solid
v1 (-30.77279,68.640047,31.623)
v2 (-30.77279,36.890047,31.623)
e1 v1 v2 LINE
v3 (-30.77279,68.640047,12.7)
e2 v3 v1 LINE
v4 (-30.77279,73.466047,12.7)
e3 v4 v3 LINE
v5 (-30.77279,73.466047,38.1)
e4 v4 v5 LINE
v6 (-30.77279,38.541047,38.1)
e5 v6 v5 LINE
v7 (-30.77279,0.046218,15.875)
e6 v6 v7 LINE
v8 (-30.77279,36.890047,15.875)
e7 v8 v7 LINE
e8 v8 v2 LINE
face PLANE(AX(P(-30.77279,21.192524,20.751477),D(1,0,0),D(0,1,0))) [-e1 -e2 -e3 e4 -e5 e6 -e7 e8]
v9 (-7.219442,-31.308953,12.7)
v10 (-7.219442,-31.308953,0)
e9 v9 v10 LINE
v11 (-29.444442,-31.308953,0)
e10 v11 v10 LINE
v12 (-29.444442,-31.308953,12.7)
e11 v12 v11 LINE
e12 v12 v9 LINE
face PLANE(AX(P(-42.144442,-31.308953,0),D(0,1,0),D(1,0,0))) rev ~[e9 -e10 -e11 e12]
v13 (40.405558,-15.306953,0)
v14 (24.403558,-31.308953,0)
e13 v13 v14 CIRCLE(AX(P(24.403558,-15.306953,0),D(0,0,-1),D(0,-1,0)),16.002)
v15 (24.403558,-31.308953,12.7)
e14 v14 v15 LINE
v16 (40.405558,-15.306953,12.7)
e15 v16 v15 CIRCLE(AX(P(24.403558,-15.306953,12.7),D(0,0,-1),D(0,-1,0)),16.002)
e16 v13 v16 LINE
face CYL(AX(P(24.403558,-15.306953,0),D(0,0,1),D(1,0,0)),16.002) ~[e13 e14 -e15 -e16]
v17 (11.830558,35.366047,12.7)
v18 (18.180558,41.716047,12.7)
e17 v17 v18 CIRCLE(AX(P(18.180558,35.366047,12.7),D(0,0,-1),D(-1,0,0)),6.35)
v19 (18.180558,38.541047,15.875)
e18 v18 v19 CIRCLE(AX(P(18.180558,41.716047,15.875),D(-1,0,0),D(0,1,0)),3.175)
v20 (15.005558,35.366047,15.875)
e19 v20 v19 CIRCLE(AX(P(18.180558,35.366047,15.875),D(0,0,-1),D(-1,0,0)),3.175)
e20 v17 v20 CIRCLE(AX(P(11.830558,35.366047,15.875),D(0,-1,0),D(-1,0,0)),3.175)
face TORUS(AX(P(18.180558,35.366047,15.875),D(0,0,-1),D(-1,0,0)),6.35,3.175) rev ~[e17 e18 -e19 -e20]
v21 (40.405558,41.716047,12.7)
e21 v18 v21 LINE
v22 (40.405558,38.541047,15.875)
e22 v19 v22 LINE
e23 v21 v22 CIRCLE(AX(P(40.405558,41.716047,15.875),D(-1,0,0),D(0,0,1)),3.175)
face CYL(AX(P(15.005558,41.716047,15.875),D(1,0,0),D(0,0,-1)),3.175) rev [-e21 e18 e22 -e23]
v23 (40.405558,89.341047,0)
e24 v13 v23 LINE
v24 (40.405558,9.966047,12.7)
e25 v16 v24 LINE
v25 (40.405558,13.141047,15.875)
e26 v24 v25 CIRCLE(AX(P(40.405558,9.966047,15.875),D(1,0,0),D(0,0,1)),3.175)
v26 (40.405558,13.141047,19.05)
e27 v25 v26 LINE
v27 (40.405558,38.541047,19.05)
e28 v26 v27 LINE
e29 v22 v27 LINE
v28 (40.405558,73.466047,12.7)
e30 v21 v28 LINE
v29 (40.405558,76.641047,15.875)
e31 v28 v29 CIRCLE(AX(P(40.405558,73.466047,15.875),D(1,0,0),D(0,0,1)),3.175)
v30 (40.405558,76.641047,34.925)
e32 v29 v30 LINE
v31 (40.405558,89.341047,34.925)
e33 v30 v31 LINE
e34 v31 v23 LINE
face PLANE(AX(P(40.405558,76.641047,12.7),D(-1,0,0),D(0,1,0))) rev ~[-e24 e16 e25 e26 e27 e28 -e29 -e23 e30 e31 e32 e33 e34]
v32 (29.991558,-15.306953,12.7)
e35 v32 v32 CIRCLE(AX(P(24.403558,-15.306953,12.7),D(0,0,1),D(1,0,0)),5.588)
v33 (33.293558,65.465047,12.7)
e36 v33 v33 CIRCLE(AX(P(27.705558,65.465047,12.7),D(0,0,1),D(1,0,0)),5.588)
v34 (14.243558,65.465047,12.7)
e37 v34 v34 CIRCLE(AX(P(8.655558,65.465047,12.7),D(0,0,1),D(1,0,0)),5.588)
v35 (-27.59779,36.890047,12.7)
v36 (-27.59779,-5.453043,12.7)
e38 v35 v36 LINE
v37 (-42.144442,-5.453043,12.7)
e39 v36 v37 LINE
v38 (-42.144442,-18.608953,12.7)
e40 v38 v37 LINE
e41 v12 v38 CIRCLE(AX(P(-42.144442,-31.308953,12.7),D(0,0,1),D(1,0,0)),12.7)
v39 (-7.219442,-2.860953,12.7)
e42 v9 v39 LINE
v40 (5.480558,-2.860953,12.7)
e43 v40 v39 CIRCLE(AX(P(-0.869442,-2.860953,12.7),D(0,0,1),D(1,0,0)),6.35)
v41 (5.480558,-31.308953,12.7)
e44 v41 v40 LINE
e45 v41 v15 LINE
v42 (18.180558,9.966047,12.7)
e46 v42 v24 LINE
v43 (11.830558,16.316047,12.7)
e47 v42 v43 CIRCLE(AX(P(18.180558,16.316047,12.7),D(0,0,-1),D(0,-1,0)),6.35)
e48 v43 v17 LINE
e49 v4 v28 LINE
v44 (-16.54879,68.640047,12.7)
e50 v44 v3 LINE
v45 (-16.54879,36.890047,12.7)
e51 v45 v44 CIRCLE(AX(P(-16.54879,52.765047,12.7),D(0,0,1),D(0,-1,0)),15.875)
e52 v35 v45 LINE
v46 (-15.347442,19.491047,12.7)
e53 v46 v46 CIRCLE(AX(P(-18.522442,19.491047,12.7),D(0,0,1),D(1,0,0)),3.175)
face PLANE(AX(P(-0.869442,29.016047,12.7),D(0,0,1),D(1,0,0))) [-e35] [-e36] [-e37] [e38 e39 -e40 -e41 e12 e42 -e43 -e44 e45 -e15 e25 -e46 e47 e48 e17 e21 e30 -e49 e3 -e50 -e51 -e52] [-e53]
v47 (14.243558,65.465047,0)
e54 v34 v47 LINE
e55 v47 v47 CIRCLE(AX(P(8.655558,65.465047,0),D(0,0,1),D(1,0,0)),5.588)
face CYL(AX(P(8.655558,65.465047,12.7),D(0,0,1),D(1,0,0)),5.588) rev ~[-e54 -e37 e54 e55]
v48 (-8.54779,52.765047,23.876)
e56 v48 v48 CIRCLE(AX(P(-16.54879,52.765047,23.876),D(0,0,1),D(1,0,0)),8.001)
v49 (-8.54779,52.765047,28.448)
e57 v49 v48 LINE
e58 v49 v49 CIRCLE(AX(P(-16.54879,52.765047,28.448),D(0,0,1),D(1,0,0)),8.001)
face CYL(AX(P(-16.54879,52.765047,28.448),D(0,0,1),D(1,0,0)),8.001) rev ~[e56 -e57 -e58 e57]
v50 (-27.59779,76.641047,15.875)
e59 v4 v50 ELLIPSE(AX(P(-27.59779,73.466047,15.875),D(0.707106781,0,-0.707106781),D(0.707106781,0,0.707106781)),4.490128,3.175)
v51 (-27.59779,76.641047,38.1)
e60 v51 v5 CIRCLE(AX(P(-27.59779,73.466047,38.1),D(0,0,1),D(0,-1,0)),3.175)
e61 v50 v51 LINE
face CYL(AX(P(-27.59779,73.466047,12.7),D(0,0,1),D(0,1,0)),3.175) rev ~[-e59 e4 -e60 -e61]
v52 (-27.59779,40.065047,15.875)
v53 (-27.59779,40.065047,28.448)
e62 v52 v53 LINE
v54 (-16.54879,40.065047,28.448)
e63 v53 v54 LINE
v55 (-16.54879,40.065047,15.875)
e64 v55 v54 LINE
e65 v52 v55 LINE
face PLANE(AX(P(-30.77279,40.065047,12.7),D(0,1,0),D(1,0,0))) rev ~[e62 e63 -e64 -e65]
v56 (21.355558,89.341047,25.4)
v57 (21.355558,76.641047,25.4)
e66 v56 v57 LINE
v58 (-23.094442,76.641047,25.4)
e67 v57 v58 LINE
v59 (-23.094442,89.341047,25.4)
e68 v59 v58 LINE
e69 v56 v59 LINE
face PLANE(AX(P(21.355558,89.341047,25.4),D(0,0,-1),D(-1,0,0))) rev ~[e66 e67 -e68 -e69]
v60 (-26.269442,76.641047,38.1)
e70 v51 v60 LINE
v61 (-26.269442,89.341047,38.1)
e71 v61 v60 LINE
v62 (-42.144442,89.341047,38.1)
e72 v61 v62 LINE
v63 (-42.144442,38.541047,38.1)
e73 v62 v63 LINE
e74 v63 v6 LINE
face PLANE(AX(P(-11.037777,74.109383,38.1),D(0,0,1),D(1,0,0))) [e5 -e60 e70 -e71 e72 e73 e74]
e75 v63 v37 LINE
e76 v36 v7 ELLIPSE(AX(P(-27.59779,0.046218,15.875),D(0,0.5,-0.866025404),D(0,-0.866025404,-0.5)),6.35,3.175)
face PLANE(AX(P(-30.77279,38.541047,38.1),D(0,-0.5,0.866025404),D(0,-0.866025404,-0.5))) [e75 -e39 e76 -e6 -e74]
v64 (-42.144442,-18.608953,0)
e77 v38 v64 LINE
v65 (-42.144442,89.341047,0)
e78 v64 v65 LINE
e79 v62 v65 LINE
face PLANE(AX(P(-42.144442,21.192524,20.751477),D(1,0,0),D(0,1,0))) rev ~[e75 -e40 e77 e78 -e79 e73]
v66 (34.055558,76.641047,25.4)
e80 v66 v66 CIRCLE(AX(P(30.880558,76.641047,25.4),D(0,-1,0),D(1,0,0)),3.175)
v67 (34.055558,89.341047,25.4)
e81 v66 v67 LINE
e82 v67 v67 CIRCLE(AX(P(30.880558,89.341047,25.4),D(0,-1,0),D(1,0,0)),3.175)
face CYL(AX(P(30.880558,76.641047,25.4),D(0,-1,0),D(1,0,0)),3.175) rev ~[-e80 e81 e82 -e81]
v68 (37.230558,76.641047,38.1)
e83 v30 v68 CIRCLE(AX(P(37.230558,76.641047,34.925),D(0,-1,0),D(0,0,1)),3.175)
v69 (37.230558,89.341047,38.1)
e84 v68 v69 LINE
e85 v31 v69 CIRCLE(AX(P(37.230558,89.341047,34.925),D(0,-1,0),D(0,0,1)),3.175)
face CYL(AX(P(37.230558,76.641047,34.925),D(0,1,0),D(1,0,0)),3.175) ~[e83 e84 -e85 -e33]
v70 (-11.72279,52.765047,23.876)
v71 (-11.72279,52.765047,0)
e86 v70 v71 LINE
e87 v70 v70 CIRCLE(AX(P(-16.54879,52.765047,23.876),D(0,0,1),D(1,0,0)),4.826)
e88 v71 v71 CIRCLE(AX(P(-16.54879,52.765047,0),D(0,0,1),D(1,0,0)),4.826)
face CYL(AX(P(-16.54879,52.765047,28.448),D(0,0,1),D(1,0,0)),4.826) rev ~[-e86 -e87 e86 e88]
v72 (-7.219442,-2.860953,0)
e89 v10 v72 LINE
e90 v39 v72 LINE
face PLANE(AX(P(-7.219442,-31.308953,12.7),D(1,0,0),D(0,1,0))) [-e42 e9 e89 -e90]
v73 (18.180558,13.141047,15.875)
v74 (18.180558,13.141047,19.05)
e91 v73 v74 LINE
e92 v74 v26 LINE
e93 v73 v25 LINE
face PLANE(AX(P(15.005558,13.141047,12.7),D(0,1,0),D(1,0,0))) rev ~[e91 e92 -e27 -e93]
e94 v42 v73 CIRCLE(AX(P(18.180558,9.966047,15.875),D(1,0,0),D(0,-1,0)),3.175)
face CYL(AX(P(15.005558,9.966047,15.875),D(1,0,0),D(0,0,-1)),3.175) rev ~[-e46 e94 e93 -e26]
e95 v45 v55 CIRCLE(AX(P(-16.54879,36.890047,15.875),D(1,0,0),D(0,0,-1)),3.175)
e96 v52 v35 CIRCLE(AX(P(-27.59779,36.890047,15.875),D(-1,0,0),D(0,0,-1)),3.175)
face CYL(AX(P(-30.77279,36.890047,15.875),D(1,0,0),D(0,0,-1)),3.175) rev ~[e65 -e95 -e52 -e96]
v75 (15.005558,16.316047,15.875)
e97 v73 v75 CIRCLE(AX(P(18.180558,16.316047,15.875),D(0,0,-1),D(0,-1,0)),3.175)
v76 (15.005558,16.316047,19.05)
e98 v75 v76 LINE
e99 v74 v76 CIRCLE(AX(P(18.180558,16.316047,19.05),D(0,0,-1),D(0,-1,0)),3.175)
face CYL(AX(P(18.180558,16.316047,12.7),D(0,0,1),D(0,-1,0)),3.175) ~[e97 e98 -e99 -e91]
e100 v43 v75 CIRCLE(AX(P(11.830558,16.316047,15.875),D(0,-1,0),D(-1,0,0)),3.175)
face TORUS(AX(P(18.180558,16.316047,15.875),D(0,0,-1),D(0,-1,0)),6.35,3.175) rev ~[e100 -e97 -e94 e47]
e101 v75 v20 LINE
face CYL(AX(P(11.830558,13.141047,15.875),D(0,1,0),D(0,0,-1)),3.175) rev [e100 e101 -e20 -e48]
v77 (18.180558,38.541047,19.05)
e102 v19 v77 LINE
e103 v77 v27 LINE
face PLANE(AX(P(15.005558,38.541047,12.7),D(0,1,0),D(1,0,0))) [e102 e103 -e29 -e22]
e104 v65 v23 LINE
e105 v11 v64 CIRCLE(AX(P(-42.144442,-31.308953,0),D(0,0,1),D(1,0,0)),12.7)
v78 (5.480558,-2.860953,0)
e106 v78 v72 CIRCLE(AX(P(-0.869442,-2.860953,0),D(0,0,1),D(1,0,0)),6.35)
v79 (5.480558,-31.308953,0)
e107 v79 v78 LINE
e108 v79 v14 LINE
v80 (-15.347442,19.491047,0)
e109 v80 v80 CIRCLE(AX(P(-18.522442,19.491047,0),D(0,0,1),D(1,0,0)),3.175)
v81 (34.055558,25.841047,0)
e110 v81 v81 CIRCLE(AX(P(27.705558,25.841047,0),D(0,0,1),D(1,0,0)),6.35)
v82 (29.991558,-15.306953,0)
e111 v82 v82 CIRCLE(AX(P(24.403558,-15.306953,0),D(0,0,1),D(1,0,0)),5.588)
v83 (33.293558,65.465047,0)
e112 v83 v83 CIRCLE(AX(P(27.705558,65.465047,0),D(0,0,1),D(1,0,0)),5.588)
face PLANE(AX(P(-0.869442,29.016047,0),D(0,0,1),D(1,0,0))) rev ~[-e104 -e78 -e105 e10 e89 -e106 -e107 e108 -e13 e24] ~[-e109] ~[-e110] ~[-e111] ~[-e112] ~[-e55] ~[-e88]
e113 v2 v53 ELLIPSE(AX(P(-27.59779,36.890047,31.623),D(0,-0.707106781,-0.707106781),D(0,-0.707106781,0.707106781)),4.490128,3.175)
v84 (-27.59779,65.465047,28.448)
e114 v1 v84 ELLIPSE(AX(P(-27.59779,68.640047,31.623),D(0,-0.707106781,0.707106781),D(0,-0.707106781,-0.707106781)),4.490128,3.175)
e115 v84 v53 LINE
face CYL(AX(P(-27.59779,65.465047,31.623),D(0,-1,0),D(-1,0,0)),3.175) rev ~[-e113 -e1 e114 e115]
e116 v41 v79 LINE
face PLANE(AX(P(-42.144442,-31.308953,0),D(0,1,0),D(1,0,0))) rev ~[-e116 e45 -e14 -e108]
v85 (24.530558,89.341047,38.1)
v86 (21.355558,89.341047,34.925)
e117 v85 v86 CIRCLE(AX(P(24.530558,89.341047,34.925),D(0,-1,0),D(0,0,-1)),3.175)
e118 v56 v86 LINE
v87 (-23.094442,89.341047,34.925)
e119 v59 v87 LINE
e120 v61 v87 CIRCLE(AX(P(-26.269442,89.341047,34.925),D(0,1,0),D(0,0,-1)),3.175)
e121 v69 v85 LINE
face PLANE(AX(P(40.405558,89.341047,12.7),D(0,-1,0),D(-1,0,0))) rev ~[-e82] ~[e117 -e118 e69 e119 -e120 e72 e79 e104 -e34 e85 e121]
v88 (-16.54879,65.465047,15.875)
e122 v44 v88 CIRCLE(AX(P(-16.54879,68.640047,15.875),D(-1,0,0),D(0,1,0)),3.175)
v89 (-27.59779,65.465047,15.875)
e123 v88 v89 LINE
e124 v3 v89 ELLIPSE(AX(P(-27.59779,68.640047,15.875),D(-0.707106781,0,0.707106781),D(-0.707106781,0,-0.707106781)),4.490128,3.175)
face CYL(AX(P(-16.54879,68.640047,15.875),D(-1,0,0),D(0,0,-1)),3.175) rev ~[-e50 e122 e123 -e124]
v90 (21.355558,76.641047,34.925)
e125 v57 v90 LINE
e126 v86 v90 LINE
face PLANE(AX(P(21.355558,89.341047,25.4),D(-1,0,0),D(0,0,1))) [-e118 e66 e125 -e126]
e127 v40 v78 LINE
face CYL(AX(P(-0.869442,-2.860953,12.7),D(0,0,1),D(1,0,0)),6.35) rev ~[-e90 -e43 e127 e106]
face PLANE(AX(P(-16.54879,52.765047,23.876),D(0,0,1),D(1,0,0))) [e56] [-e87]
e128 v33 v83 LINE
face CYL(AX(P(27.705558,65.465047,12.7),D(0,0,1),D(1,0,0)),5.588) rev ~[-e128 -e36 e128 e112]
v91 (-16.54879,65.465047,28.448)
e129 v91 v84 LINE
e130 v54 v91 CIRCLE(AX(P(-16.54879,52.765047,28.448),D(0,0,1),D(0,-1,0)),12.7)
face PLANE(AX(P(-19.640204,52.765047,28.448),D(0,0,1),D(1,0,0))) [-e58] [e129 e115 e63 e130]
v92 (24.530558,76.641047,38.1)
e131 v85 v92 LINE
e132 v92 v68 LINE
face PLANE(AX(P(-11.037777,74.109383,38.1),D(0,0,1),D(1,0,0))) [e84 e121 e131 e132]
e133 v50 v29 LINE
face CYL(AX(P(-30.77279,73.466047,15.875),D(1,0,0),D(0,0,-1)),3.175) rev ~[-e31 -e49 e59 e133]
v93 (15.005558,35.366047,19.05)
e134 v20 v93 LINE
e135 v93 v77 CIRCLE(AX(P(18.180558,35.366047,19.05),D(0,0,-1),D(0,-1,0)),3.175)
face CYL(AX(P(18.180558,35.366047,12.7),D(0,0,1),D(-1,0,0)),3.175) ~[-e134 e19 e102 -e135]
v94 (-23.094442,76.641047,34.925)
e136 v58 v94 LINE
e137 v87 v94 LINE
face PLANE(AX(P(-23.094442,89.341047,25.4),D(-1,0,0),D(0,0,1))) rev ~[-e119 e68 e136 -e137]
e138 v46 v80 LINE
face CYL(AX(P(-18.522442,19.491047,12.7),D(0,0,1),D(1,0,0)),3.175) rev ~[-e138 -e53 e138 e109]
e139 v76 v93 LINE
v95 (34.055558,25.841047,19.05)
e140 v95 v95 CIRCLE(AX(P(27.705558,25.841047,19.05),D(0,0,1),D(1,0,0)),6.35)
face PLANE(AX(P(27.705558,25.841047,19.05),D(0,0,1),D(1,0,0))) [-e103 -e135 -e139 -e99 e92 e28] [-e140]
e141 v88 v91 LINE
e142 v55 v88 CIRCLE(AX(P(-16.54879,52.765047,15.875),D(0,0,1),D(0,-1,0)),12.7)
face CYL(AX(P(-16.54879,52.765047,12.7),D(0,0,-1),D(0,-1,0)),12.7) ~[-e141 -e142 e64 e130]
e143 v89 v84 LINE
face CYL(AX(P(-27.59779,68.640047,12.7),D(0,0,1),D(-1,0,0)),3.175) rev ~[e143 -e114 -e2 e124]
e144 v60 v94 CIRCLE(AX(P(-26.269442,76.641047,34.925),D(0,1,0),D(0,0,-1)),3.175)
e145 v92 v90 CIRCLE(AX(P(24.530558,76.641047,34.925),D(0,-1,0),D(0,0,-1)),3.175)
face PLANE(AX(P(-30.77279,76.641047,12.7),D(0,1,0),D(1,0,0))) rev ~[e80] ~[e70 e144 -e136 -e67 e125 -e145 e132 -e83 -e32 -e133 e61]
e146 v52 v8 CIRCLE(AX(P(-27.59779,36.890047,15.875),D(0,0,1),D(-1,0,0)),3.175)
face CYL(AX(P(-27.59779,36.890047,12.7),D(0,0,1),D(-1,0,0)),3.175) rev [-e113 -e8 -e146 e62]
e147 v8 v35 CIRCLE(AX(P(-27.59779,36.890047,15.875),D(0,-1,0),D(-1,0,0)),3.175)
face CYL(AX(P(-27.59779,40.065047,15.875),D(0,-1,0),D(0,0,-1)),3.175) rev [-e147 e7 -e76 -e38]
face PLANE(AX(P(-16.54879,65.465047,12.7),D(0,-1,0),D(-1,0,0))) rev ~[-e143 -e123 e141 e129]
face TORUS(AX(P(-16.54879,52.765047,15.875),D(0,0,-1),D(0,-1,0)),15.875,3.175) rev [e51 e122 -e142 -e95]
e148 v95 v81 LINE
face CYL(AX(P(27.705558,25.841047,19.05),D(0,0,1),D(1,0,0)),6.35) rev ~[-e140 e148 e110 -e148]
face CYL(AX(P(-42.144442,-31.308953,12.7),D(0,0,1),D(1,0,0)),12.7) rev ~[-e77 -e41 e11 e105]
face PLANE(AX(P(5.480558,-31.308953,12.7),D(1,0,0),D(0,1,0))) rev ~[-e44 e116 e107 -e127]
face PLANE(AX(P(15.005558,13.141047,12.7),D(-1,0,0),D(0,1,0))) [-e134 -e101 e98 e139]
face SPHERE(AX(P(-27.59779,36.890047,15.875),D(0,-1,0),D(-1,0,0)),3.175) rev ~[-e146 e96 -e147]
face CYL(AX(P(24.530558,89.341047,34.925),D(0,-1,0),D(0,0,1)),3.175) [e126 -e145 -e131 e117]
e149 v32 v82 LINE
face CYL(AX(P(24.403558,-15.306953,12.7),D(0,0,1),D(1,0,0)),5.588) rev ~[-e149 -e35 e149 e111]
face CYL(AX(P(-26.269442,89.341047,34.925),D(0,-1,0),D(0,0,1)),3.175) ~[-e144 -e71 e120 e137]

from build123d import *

# Parameters (mm, degrees)
F0_W      = 82.55
F0_H      = 120.65
F1_DEPTH  = 12.7
F3_DEPTH  = 25.4
F5_DEPTH  = 11.3716514647
F6_W      = 44.45
F6_H      = 12.7
F7_DEPTH  = 25.4
F8_W      = 25.4
F8_H      = 25.4
F9_DEPTH  = 6.35
F10_R     = 6.35
F11_DEPTH = 19.051
F13_DEPTH = 15.748
F14_R     = 4.826
F15_DEPTH = 28.449
F16_R     = 8.001
F16_R_2   = 4.826
F17_DEPTH = 4.572
F18_W     = 12.7
F18_H     = 28.448
F19_DEPTH = 25.4
F20_R     = 3.175
F20_R_2   = 5.588
F21_DEPTH = 12.701
F22_R     = 3.175
F23_DEPTH = 25.4
F25_DEPTH = 25.4
F26_R     = 16.002
F27_R     = 3.175


with BuildPart() as f1:
    # F0 (on Top) → F1 (new body)
    with BuildSketch(Plane.XY):
        with Locations((-0.8694417775, 29.0160470424)):
            Rectangle(F0_W, F0_H)
    extrude(amount=F1_DEPTH)

    # F2 (on face) → F3 (join)
    with BuildSketch(Plane.XY.offset(12.7)):
        Polygon((-30.7727903128, 89.3410470424), (-42.1444417775, 89.3410470424), (-42.1444417775, 76.6410470424), (-42.1444417775, 38.5410470424), (-30.7727903128, 38.5410470424), (-30.7727903128, 76.6410470424), (40.4055582225, 76.6410470424), (40.4055582225, 89.3410470424), align=None)
    extrude(amount=F3_DEPTH)

    # F4 (on face) → F5 (join, through all)
    with BuildSketch(Plane.YZ.offset(-30.7727903128)):
        Polygon((38.5410470424, 12.7), (38.5410470424, 38.1), (-5.4530434699, 12.7), align=None)
    extrude(amount=-F5_DEPTH)

    # F6 (on face) → F7 (cut)
    with BuildSketch(Plane(origin=(0, 89.3410470424, 0), x_dir=(-1, 0, 0), z_dir=(0, 1, 0))):
        with Locations((0.8694417775, 31.75)):
            Rectangle(F6_W, F6_H)
    extrude(amount=-F7_DEPTH, mode=Mode.SUBTRACT)

    # F8 (on face) → F9 (join)
    with BuildSketch(Plane.XY.offset(12.7)):
        with Locations((27.7055582225, 25.8410470424)):
            Rectangle(F8_W, F8_H)
    extrude(amount=F9_DEPTH)

    # F10 (on face) → F11 (cut, through all)
    with BuildSketch(Plane.XY.offset(19.05)):
        with Locations((27.7055582225, 25.8410470424)):
            Circle(F10_R)
    extrude(amount=-F11_DEPTH, mode=Mode.SUBTRACT)

    # F12 (on face) → F13 (join)
    with BuildSketch(Plane.XY.offset(12.7)):
        with BuildLine():
            Line((-30.7727903128, 65.4650470424), (-30.7727903128, 40.0650470424))
            Line((-30.7727903128, 40.0650470424), (-16.5487903128, 40.0650470424))
            ThreePointArc((-16.5487903128, 40.0650470424), (-3.8487903128, 52.7650470424), (-16.5487903128, 65.4650470424))
            Line((-16.5487903128, 65.4650470424), (-30.7727903128, 65.4650470424))
        make_face()
    extrude(amount=F13_DEPTH)

    # F14 (on face) → F15 (cut, through all)
    with BuildSketch(Plane.XY.offset(28.448)):
        with Locations((-16.5487903128, 52.7650470424)):
            Circle(F14_R)
    extrude(amount=-F15_DEPTH, mode=Mode.SUBTRACT)

    # F16 (on face) → F17 (cut)
    with BuildSketch(Plane.XY.offset(28.448)):
        with Locations((-16.5487903128, 52.7650470424)):
            Circle(F16_R)
        with Locations((-16.5487903128, 52.7650470424)):
            Circle(F16_R_2, mode=Mode.SUBTRACT)
    extrude(amount=-F17_DEPTH, mode=Mode.SUBTRACT)

    # F18 (on face) → F19 (cut)
    with BuildSketch(Plane.XY.offset(12.7)):
        with Locations((-0.8694417775, -17.0849529576)):
            Rectangle(F18_W, F18_H)
        with BuildLine():
            ThreePointArc((5.4805582225, -2.8609529576), (-0.8694417775, 3.4890470424), (-7.2194417775, -2.8609529576))
            Line((-7.2194417775, -2.8609529576), (5.4805582225, -2.8609529576))
        make_face()
    extrude(amount=-F19_DEPTH, mode=Mode.SUBTRACT)

    # F20 (on face) → F21 (cut, through all)
    with BuildSketch(Plane.XY.offset(12.7)):
        with Locations((-18.5224417775, 19.4910470424)):
            Circle(F20_R)
        with Locations((24.4035582225, -15.3069529576)):
            Circle(F20_R_2)
        with Locations((27.7055582225, 65.4650470424)):
            Circle(F20_R_2)
        with Locations((8.6555582225, 65.4650470424)):
            Circle(F20_R_2)
    extrude(amount=-F21_DEPTH, mode=Mode.SUBTRACT)

    # F22 (on face) → F23 (cut)
    with BuildSketch(Plane.XZ.offset(-76.6410470424)):
        with Locations((30.8805582225, 25.4)):
            Circle(F22_R)
    extrude(amount=-F23_DEPTH, mode=Mode.SUBTRACT)

    # F24 (on face) → F25 (cut)
    with BuildSketch(Plane.XY.offset(12.7)):
        with BuildLine():
            Line((-42.1444417775, -31.3089529576), (-29.4444417775, -31.3089529576))
            ThreePointArc((-29.4444417775, -31.3089529576), (-33.1641856564, -22.3286968366), (-42.1444417775, -18.6089529576))
            Line((-42.1444417775, -18.6089529576), (-42.1444417775, -31.3089529576))
        make_face()
    extrude(amount=-F25_DEPTH, mode=Mode.SUBTRACT)

    # F26
    f26_edges = [f1.edges().sort_by_distance(p)[0] for p in [
        (40.405558, -31.308953, 6.35),
    ]]
    fillet(f26_edges, radius=F26_R)

    # F27
    f27_edges = [f1.edges().sort_by_distance(p)[0] for p in [
        (-30.77279, 17.306002, 12.7),
        (-30.77279, 40.065047, 20.574),
        (-23.66079, 40.065047, 12.7),
        (-30.77279, 52.765047, 28.448),
        (4.816384, 76.641047, 12.7),
        (-30.77279, 65.465047, 20.574),
        (-30.77279, 76.641047, 25.4),
        (15.005558, 13.141047, 15.875),
        (15.005558, 38.541047, 15.875),
        (-23.094442, 82.991047, 38.1),
        (40.405558, 82.991047, 38.1),
        (21.355558, 82.991047, 38.1),
        (27.705558, 13.141047, 12.7),
        (15.005558, 25.841047, 12.7),
        (27.705558, 38.541047, 12.7),
        (-23.66079, 65.465047, 12.7),
        (-3.84879, 52.765047, 12.7),
    ]]
    fillet(f27_edges, radius=F27_R)


solid = f1.part
